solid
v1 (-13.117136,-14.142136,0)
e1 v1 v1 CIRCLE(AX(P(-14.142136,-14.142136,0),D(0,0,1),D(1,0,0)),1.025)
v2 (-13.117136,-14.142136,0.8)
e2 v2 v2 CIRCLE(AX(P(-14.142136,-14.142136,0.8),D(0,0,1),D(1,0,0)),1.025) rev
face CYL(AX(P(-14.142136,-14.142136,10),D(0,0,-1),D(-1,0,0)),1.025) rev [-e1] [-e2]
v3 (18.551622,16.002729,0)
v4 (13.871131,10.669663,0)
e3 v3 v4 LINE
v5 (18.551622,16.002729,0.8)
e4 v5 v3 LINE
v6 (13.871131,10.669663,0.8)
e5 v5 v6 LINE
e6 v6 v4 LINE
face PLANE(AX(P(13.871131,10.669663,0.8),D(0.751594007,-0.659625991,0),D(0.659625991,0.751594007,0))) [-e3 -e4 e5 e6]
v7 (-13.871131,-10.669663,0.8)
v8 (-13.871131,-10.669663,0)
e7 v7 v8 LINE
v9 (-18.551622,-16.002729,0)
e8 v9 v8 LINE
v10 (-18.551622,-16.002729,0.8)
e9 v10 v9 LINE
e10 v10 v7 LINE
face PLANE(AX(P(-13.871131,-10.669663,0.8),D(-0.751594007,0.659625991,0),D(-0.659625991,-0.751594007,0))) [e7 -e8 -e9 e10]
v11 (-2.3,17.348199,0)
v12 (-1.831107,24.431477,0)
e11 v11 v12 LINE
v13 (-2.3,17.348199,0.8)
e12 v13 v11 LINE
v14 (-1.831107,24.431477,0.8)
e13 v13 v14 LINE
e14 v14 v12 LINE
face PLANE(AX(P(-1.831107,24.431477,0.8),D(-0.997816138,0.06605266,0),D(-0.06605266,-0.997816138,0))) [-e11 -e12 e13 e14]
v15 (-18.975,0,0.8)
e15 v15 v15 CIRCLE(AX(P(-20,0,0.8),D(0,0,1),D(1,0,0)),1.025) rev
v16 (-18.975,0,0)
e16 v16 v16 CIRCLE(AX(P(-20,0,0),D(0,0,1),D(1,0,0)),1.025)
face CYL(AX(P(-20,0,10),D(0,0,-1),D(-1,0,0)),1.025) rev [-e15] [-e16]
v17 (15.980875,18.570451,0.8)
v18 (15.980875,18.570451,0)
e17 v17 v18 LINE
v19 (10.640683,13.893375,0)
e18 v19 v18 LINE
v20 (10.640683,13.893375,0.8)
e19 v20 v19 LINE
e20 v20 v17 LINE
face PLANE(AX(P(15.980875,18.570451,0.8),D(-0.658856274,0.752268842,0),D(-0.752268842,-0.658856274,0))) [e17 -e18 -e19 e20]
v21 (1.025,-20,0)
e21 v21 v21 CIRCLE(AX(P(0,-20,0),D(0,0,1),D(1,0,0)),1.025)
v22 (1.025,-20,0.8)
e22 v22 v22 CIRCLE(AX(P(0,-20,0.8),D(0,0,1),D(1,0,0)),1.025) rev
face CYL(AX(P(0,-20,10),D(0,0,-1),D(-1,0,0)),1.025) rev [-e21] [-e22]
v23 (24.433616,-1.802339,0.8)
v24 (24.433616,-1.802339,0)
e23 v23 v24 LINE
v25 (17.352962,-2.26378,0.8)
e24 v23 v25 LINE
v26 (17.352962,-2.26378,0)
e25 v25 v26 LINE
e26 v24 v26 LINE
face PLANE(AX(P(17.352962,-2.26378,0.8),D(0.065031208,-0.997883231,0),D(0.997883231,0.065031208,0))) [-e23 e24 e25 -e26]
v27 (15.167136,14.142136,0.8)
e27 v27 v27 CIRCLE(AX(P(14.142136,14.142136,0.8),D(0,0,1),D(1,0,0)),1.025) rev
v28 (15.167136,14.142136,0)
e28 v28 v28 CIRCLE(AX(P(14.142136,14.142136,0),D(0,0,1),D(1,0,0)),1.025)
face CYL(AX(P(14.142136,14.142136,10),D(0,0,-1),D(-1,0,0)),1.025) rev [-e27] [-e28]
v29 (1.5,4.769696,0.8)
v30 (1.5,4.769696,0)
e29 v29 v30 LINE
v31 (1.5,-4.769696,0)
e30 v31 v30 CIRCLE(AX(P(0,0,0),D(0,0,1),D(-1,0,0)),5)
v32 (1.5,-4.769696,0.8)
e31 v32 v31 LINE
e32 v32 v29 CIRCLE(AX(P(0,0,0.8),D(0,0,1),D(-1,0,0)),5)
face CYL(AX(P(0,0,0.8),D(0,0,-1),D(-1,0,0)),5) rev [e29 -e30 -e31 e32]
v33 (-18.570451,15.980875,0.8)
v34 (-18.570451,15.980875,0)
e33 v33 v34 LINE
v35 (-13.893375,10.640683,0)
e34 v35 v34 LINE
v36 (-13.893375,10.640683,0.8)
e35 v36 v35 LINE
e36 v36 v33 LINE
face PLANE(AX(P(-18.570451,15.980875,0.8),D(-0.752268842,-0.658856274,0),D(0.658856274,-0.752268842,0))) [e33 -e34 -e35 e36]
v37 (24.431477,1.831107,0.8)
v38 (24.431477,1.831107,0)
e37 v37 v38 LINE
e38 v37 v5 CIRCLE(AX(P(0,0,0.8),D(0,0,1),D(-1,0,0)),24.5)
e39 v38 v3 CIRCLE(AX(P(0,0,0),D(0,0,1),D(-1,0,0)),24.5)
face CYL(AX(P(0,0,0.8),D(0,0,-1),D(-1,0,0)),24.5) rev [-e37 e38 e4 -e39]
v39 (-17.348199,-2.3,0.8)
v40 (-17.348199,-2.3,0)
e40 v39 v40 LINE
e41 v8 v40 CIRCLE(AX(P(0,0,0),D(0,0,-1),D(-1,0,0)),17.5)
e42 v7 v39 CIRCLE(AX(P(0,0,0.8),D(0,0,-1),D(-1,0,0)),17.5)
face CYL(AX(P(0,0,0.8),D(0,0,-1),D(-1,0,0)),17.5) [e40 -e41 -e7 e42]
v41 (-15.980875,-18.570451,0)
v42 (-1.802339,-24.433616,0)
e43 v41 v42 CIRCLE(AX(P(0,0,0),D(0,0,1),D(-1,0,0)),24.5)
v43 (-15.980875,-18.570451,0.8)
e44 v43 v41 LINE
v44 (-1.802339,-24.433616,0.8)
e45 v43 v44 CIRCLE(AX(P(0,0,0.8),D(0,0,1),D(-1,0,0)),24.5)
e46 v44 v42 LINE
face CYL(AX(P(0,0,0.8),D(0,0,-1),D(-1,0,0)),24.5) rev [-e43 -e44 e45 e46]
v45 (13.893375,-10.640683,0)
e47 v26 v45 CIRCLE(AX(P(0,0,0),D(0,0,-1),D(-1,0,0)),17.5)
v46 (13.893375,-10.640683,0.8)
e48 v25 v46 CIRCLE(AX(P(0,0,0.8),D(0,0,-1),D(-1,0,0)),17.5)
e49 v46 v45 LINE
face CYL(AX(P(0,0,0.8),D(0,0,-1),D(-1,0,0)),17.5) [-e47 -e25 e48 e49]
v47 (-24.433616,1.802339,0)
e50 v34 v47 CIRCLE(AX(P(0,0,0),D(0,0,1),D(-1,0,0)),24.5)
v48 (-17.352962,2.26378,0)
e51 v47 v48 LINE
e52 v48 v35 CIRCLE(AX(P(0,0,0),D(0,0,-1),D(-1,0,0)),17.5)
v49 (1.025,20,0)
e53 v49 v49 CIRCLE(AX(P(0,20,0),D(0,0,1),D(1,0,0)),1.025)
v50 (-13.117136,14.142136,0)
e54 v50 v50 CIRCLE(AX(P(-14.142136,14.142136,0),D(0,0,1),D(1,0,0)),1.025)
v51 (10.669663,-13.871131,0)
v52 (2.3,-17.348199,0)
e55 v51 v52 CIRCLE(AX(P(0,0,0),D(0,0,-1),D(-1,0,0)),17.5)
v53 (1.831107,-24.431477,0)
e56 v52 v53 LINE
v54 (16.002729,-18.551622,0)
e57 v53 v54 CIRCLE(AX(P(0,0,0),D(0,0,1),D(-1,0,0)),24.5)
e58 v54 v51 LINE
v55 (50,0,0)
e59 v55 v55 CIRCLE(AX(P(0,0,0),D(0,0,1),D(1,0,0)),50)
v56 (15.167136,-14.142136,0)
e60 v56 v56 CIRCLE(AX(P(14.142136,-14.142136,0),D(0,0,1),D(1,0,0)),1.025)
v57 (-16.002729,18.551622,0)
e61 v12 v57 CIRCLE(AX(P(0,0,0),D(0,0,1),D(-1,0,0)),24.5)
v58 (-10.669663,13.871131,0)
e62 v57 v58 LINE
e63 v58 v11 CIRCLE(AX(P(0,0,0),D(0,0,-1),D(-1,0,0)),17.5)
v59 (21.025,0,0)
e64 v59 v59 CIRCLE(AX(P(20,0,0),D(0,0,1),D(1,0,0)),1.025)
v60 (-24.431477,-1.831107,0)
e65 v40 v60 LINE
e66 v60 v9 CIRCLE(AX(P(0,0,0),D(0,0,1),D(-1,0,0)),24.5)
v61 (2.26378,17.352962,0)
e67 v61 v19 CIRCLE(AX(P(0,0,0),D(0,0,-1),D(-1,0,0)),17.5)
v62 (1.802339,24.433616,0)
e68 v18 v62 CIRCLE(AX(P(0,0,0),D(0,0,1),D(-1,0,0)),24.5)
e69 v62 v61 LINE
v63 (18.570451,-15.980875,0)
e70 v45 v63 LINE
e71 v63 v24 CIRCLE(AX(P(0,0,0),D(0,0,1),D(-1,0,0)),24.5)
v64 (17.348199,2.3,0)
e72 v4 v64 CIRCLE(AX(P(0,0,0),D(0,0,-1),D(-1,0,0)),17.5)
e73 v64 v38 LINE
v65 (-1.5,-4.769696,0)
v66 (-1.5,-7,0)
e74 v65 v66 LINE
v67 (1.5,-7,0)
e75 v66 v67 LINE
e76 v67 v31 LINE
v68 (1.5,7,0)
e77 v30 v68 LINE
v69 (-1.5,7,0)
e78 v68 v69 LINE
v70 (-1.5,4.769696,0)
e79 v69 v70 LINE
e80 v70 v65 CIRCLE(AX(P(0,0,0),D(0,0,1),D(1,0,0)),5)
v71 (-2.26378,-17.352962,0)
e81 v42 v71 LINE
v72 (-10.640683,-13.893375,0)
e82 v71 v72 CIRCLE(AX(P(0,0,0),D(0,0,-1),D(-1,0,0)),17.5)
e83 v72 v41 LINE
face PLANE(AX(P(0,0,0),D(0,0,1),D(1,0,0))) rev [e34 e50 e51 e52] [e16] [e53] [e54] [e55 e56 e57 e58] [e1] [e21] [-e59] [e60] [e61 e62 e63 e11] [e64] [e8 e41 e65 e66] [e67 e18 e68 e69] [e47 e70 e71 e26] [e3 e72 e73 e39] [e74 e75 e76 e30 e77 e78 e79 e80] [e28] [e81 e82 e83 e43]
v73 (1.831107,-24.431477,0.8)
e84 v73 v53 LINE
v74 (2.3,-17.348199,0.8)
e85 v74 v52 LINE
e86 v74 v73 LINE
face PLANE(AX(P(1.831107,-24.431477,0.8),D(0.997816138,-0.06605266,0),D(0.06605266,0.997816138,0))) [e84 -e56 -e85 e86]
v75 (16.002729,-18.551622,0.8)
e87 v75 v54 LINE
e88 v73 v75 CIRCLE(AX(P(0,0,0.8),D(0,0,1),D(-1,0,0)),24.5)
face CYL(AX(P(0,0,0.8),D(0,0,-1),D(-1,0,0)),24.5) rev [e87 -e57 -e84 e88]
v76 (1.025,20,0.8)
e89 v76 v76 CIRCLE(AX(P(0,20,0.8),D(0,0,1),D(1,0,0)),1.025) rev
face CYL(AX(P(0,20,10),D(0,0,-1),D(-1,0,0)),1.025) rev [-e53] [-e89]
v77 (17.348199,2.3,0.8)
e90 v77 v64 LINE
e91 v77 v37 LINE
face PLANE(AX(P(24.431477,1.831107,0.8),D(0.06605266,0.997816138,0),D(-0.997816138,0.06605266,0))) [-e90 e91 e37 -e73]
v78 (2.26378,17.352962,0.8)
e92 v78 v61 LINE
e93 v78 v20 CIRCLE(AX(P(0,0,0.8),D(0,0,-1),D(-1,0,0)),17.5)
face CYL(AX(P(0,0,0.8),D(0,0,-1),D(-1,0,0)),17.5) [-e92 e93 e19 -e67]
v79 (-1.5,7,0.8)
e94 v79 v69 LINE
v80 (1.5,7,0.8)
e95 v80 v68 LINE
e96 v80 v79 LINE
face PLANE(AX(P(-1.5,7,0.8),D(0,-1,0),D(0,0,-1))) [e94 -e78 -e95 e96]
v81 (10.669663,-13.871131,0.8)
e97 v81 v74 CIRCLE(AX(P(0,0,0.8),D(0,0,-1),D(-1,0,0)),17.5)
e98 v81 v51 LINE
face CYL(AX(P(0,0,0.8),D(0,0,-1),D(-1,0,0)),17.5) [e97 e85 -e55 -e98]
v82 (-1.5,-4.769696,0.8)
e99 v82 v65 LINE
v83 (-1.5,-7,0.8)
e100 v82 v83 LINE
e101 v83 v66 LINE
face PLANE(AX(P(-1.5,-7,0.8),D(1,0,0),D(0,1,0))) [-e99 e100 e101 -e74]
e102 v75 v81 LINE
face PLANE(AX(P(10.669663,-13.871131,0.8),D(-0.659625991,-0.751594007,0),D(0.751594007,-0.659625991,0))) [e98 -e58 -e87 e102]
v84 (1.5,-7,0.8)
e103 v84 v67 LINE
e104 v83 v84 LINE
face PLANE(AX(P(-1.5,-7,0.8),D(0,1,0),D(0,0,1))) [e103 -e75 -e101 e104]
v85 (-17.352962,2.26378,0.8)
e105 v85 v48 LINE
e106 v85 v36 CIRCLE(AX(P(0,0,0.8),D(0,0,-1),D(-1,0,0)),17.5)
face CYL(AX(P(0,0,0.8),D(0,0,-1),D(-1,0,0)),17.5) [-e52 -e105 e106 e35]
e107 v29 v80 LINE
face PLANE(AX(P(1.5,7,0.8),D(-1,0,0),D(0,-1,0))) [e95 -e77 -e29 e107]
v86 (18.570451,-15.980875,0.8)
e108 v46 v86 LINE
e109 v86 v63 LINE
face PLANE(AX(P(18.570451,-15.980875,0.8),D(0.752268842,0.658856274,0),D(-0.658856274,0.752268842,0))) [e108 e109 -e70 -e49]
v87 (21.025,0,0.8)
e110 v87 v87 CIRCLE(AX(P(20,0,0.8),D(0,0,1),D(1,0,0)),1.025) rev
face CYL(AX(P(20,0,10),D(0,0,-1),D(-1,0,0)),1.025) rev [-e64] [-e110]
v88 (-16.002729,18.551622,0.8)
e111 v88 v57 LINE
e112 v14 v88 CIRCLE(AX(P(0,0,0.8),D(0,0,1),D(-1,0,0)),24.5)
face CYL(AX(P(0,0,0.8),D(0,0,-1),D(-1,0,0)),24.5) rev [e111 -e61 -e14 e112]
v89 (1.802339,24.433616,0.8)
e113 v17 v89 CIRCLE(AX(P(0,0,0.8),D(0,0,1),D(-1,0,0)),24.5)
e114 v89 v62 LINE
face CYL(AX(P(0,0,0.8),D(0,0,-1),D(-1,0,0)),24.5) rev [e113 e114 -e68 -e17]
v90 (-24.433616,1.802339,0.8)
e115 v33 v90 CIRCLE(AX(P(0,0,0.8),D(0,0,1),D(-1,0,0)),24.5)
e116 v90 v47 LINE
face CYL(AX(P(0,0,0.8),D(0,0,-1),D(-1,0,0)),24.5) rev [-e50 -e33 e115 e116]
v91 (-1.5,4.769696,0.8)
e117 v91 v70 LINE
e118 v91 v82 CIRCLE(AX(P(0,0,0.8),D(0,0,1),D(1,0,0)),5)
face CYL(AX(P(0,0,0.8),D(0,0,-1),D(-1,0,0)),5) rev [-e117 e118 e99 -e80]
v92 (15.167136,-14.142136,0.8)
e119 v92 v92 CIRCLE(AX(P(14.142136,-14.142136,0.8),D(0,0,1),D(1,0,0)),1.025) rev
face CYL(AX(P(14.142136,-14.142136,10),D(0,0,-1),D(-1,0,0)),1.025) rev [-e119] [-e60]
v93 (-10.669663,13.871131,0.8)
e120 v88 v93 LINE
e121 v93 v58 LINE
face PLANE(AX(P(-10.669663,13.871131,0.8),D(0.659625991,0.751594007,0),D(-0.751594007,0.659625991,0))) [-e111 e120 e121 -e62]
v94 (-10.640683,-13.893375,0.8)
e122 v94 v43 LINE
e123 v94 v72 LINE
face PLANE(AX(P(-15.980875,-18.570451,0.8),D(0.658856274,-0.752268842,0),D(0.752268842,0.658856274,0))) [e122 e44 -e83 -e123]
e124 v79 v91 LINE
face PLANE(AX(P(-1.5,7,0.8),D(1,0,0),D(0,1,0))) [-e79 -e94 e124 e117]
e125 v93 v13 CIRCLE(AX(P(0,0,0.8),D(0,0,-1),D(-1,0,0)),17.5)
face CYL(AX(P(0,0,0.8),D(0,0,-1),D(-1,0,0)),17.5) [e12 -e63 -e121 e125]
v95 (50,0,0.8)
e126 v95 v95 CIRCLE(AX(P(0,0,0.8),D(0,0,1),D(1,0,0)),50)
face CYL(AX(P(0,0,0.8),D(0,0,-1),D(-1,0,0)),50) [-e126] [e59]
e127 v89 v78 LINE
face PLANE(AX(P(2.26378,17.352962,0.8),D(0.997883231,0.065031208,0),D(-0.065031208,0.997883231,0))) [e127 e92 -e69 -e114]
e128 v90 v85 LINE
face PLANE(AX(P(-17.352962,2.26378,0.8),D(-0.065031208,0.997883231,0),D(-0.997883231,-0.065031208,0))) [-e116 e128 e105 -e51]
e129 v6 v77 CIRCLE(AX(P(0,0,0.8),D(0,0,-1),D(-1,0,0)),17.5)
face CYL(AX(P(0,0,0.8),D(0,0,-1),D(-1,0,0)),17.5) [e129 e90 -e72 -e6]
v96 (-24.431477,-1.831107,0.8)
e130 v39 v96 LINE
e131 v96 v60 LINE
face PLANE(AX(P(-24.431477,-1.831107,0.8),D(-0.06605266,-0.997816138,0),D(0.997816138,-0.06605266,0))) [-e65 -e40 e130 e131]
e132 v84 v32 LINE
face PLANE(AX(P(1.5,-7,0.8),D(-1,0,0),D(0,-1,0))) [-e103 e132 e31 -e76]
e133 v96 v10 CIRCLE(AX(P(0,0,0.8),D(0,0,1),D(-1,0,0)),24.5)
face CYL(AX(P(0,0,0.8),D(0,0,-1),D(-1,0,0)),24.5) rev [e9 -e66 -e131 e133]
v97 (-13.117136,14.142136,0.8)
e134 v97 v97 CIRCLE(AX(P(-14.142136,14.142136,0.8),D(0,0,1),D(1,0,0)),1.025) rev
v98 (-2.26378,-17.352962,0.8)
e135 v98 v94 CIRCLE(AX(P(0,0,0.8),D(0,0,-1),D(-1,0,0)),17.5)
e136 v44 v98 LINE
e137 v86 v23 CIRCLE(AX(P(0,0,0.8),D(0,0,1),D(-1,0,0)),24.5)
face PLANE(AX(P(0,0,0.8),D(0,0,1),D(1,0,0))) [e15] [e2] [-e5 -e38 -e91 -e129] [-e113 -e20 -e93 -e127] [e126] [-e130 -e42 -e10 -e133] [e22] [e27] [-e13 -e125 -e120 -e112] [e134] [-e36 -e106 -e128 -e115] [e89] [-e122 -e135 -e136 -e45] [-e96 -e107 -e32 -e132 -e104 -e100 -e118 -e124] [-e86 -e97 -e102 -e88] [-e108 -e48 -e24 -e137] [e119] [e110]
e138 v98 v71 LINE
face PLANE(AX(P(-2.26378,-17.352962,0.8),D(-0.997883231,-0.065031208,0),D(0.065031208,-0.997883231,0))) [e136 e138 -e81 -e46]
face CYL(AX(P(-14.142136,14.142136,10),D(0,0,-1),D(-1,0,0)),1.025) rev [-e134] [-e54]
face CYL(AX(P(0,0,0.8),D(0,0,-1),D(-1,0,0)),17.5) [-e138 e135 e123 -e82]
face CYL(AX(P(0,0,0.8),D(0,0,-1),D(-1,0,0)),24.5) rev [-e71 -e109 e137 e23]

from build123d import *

# Parameters (mm, degrees)
BOSS_EXTRUDE1_OUTLINE_R = 50
BOSS_EXTRUDE1_DEPTH     = 0.8
SKETCH2_R               = 1.025
CUT_EXTRUDE5_DEPTH      = 10


# Read off the part's stored shape, not the designer's step: Boss-Extrude1
with BuildPart() as part:
    # Boss-Extrude1 outline → Boss-Extrude1 (new body)
    with BuildSketch(Plane.XY):
        Circle(BOSS_EXTRUDE1_OUTLINE_R)
        with BuildLine():
            ThreePointArc((-10.640683383, -13.893374577), (-6.680080661, -16.174873179), (-2.263779528, -17.352962348))
            Line((-2.263779528, -17.352962348), (-1.802339331, -24.433615634))
            ThreePointArc((-1.802339331, -24.433615634), (-9.36241701, -22.64056421), (-15.980874836, -18.570450707))
            Line((-15.980874836, -18.570450707), (-10.640683383, -13.893374577))
        make_face(mode=Mode.SUBTRACT)
        with BuildLine():
            ThreePointArc((-17.348198754, -2.3), (-16.160892844, -6.713832175), (-13.871131205, -10.669663495))
            Line((-13.871131205, -10.669663495), (-18.551621667, -16.00272894))
            ThreePointArc((-18.551621667, -16.00272894), (-22.629525039, -9.389067926), (-24.431476591, -1.831106659))
            Line((-24.431476591, -1.831106659), (-17.348198754, -2.3))
        make_face(mode=Mode.SUBTRACT)
        with BuildLine():
            ThreePointArc((2.3, -17.348198754), (6.713832175, -16.160892844), (10.669663495, -13.871131205))
            Line((10.669663495, -13.871131205), (16.00272894, -18.551621667))
            ThreePointArc((16.00272894, -18.551621667), (9.389067926, -22.629525039), (1.831106659, -24.431476591))
            Line((1.831106659, -24.431476591), (2.3, -17.348198754))
        make_face(mode=Mode.SUBTRACT)
        with BuildLine():
            ThreePointArc((13.893374577, -10.640683383), (16.174873179, -6.680080661), (17.352962348, -2.263779528))
            Line((17.352962348, -2.263779528), (24.433615634, -1.802339331))
            ThreePointArc((24.433615634, -1.802339331), (22.64056421, -9.36241701), (18.570450707, -15.980874836))
            Line((18.570450707, -15.980874836), (13.893374577, -10.640683383))
        make_face(mode=Mode.SUBTRACT)
        with BuildLine():
            ThreePointArc((-13.893374577, 10.640683383), (-16.174873179, 6.680080661), (-17.352962348, 2.263779528))
            Line((-17.352962348, 2.263779528), (-24.433615634, 1.802339331))
            ThreePointArc((-24.433615634, 1.802339331), (-22.64056421, 9.36241701), (-18.570450707, 15.980874836))
            Line((-18.570450707, 15.980874836), (-13.893374577, 10.640683383))
        make_face(mode=Mode.SUBTRACT)
        with BuildLine():
            ThreePointArc((-2.3, 17.348198754), (-6.713832175, 16.160892844), (-10.669663495, 13.871131205))
            Line((-10.669663495, 13.871131205), (-16.00272894, 18.551621667))
            ThreePointArc((-16.00272894, 18.551621667), (-9.389067926, 22.629525039), (-1.831106659, 24.431476591))
            Line((-1.831106659, 24.431476591), (-2.3, 17.348198754))
        make_face(mode=Mode.SUBTRACT)
        with BuildLine():
            ThreePointArc((-1.5, -4.769696007), (-5, 0), (-1.5, 4.769696007))
            Line((-1.5, 4.769696007), (-1.5, 7))
            Line((-1.5, 7), (1.5, 7))
            Line((1.5, 7), (1.5, 4.769696007))
            ThreePointArc((1.5, 4.769696007), (5, 0), (1.5, -4.769696007))
            Line((1.5, -4.769696007), (1.5, -7))
            Line((1.5, -7), (-1.5, -7))
            Line((-1.5, -7), (-1.5, -4.769696007))
        make_face(mode=Mode.SUBTRACT)
        with BuildLine():
            ThreePointArc((17.348198754, 2.3), (16.160892844, 6.713832175), (13.871131205, 10.669663495))
            Line((13.871131205, 10.669663495), (18.551621667, 16.00272894))
            ThreePointArc((18.551621667, 16.00272894), (22.629525039, 9.389067926), (24.431476591, 1.831106659))
            Line((24.431476591, 1.831106659), (17.348198754, 2.3))
        make_face(mode=Mode.SUBTRACT)
        with BuildLine():
            ThreePointArc((10.640683383, 13.893374577), (6.680080661, 16.174873179), (2.263779528, 17.352962348))
            Line((2.263779528, 17.352962348), (1.802339331, 24.433615634))
            ThreePointArc((1.802339331, 24.433615634), (9.36241701, 22.64056421), (15.980874836, 18.570450707))
            Line((15.980874836, 18.570450707), (10.640683383, 13.893374577))
        make_face(mode=Mode.SUBTRACT)
    extrude(amount=BOSS_EXTRUDE1_DEPTH)

    # Sketch2 → Cut-Extrude5 (cut)
    with BuildSketch(Plane.XY):
        with Locations((0, 20)):
            Circle(SKETCH2_R)
        with Locations((14.142135624, 14.142135624)):
            Circle(SKETCH2_R)
        with Locations((20, 0)):
            Circle(SKETCH2_R)
        with Locations((14.142135624, -14.142135624)):
            Circle(SKETCH2_R)
        with Locations((0, -20)):
            Circle(SKETCH2_R)
        with Locations((-14.142135624, -14.142135624)):
            Circle(SKETCH2_R)
        with Locations((-20, 0)):
            Circle(SKETCH2_R)
        with Locations((-14.142135624, 14.142135624)):
            Circle(SKETCH2_R)
    extrude(amount=CUT_EXTRUDE5_DEPTH, mode=Mode.SUBTRACT)


solid = part.part
